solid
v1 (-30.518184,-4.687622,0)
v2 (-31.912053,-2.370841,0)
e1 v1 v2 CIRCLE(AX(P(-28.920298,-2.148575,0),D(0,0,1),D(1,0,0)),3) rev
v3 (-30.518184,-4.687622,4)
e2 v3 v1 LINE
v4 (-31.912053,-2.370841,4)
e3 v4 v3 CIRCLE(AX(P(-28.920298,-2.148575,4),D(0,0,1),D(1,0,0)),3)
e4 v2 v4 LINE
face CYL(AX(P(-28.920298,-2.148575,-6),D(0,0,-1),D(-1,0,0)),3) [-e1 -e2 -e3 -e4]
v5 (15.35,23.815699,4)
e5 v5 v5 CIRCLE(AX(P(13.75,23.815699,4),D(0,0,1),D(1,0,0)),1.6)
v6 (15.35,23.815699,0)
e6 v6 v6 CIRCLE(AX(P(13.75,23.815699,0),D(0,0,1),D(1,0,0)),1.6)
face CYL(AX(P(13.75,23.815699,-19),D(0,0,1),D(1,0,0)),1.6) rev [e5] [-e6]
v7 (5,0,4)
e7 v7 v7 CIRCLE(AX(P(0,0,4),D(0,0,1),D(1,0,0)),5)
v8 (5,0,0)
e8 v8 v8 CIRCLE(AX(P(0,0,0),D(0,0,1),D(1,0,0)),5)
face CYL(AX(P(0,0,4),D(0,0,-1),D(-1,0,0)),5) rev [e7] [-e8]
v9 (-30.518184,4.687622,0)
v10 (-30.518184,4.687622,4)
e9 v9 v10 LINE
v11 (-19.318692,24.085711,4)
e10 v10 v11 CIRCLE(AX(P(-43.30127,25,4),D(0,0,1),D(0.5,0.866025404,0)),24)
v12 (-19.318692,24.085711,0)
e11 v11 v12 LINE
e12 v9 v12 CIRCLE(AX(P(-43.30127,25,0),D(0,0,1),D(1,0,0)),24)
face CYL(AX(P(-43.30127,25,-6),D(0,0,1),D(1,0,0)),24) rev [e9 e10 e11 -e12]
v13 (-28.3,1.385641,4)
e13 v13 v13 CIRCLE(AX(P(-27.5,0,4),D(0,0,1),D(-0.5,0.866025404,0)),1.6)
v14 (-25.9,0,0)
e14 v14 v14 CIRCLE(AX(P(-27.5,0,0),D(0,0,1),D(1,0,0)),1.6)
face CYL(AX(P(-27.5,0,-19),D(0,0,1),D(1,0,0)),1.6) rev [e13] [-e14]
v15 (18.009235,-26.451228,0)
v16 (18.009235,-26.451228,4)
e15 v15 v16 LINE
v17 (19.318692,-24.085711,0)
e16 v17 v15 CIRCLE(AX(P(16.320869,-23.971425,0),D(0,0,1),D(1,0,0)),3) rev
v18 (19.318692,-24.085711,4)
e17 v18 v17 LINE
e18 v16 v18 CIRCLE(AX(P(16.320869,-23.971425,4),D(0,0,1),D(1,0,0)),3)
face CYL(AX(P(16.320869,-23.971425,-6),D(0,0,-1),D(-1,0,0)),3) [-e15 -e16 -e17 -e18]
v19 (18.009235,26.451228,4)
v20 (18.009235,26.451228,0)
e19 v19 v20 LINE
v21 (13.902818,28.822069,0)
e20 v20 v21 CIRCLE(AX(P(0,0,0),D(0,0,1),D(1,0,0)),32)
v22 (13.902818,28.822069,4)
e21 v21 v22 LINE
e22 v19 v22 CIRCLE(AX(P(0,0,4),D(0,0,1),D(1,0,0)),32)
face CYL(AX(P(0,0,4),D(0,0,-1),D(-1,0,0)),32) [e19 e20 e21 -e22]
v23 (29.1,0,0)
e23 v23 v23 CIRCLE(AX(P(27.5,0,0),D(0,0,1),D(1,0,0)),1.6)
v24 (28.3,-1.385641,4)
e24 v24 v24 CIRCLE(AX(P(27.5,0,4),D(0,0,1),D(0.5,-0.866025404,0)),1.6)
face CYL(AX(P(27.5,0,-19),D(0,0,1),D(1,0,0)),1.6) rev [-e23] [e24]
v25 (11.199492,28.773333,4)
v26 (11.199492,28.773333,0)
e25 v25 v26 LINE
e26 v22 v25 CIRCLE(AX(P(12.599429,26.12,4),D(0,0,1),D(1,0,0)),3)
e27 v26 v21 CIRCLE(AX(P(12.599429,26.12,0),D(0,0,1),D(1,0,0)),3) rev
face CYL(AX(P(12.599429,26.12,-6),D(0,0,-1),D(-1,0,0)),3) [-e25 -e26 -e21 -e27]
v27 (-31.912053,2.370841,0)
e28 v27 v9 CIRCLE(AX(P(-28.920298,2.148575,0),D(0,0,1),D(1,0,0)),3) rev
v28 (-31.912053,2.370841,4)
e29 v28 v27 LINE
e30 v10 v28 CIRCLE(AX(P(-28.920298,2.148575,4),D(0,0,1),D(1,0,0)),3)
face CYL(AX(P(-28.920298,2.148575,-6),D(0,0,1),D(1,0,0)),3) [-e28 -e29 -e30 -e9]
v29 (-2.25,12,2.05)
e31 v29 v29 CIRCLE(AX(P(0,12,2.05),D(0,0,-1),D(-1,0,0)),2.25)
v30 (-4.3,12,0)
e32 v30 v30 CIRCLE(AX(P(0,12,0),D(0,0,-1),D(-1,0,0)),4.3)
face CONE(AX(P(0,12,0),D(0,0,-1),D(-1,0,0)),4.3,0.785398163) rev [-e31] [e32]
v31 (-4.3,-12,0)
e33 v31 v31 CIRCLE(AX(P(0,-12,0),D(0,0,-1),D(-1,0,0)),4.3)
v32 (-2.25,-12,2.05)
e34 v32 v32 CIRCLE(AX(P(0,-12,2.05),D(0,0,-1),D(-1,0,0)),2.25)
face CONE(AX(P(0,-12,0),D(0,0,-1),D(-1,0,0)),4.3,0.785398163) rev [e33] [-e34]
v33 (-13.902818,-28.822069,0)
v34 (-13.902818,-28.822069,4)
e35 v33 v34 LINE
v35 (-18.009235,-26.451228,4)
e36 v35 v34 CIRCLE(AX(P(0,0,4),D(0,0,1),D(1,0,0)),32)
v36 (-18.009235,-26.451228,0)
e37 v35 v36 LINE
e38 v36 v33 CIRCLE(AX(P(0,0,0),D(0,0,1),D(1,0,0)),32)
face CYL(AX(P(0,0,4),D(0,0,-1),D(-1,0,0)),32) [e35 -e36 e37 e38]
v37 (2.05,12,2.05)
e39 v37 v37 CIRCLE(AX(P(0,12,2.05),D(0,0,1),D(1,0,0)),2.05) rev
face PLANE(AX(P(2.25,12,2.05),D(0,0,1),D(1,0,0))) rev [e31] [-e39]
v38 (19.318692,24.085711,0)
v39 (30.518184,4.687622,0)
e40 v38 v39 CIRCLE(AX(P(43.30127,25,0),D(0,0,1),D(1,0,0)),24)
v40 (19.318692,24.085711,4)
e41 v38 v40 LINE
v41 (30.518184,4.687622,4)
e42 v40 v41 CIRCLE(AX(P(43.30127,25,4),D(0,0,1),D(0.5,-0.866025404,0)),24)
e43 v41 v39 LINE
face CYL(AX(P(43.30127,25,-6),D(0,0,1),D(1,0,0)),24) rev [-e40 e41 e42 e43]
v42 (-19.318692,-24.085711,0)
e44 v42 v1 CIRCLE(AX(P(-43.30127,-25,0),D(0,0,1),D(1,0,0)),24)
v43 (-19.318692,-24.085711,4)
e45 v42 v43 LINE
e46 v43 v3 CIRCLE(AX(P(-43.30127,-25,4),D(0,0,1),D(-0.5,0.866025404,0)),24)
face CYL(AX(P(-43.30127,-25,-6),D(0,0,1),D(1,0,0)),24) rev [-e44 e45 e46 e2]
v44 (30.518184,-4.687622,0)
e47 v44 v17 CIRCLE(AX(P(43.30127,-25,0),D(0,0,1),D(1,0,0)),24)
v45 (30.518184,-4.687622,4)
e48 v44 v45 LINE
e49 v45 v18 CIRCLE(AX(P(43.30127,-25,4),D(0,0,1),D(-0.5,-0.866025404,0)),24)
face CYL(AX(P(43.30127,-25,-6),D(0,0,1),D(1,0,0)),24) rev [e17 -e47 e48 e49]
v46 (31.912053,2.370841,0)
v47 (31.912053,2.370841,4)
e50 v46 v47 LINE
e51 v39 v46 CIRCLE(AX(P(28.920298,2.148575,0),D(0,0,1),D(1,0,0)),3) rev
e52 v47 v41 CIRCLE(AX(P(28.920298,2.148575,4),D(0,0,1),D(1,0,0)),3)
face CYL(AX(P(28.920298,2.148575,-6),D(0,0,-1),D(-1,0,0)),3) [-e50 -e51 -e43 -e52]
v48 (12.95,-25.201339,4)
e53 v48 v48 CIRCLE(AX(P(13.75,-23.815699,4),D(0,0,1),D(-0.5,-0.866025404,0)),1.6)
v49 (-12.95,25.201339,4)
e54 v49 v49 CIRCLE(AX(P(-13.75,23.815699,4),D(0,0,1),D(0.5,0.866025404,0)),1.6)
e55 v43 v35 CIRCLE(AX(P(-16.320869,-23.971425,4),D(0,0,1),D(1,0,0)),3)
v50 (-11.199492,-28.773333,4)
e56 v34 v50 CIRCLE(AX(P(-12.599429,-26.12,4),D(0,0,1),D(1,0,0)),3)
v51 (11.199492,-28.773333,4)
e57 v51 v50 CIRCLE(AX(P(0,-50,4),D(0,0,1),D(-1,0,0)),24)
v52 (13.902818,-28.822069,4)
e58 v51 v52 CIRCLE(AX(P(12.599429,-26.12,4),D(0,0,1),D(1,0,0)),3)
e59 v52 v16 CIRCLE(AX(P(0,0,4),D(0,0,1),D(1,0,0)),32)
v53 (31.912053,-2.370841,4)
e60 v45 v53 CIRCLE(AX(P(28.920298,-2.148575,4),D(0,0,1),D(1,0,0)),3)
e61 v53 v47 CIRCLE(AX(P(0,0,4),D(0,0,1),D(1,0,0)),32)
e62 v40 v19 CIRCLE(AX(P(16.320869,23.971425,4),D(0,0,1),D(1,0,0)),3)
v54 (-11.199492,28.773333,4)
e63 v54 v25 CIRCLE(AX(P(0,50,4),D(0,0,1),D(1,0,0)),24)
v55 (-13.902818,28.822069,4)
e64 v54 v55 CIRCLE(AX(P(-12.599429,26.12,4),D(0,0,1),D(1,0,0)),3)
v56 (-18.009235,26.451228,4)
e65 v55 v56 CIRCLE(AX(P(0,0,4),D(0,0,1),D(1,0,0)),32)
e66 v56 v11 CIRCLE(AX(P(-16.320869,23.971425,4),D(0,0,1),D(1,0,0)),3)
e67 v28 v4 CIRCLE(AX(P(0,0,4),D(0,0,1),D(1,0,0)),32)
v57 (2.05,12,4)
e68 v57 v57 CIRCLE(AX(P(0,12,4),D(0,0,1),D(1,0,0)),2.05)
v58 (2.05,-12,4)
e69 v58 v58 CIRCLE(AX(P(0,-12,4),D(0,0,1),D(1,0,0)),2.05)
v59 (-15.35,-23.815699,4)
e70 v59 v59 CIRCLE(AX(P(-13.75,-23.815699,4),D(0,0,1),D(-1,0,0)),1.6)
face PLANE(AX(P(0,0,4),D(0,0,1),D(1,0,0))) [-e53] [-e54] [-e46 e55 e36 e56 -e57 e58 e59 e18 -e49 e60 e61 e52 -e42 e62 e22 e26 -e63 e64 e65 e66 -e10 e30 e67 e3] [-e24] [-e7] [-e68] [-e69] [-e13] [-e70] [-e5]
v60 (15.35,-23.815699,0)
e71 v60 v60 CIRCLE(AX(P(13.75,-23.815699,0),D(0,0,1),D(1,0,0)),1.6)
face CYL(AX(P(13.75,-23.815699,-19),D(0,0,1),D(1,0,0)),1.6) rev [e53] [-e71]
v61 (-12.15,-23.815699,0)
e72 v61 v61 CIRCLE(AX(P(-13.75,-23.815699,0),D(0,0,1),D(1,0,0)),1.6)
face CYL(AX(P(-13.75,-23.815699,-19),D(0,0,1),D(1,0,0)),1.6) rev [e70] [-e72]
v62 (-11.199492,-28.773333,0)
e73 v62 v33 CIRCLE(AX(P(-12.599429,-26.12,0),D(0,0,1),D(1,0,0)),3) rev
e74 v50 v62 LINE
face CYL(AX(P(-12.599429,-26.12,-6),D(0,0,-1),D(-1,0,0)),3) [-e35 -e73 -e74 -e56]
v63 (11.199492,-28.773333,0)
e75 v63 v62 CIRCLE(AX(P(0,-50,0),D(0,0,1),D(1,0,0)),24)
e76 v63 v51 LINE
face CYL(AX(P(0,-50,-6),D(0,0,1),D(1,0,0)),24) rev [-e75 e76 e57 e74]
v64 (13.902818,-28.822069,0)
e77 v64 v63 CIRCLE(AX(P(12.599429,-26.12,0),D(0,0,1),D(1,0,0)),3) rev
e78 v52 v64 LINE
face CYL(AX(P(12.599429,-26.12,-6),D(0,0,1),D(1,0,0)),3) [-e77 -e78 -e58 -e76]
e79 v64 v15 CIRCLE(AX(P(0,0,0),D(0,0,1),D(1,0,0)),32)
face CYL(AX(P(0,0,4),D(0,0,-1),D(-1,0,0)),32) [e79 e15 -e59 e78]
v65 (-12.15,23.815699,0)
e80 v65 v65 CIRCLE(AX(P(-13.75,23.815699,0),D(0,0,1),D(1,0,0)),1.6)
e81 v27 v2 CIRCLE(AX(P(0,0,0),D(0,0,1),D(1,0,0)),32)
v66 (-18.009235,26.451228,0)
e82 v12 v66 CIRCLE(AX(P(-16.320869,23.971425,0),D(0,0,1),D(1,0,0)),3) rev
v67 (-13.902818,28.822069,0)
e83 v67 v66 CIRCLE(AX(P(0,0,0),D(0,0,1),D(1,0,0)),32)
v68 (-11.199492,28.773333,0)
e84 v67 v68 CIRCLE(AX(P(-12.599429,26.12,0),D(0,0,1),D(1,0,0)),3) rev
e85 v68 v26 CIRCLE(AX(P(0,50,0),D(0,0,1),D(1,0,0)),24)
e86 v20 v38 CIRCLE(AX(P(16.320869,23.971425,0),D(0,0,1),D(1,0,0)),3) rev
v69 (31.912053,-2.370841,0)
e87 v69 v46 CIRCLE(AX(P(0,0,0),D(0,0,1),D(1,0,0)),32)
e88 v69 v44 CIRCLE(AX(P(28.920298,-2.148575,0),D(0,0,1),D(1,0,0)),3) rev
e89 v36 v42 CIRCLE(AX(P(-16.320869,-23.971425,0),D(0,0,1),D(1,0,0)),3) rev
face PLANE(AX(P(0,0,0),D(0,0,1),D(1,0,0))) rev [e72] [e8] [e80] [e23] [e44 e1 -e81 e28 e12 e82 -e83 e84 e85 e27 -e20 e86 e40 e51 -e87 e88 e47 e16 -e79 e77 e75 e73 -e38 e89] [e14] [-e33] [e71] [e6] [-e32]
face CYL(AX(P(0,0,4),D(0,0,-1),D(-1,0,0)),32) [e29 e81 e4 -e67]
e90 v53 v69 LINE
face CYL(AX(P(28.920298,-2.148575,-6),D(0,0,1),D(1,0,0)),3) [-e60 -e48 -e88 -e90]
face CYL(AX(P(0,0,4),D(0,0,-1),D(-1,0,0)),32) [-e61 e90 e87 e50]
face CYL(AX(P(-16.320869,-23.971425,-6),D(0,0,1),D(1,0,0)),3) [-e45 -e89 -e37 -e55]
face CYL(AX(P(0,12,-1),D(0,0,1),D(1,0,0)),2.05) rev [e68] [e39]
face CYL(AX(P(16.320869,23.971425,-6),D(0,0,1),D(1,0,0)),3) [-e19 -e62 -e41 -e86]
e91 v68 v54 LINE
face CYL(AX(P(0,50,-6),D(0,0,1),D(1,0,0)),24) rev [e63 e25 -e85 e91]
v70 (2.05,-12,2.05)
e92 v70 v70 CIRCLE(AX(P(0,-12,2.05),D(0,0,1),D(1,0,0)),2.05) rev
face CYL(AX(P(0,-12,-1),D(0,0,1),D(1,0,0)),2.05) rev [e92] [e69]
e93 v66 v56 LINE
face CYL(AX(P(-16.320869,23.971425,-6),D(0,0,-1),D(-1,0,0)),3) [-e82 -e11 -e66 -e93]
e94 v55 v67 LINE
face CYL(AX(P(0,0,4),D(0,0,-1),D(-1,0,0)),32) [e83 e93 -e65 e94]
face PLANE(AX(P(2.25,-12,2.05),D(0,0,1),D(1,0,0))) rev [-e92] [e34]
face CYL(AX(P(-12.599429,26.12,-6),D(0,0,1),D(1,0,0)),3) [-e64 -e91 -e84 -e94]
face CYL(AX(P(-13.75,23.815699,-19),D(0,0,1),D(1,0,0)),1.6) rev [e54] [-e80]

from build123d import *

# Parameters (mm, degrees)
SKETCH_1_R               = 32
SKETCH_1_R_2             = 5
EXTRUDE_1_DEPTH          = 4
SKETCH_2_R               = 2.05
CUT_EXTRUDE_1_DEPTH      = 5
SKETCH_3_R               = 24
CUT_EXTRUDE_2_DEPTH      = 10
PATTERN_CIRCULAR_1_COUNT = 6
SKETCH_4_R               = 1.6
CUT_EXTRUDE_3_DEPTH      = 23
PATTERN_CIRCULAR_2_COUNT = 6
FILLET_1_R               = 3


# Read off the part's stored shape, not the designer's step: 高级异型孔2
with BuildPart() as part:
    # 草图1 → 凸台-拉伸1 (new body)
    with BuildSketch(Plane.XY):
        Circle(SKETCH_1_R)
        Circle(SKETCH_1_R_2, mode=Mode.SUBTRACT)
    extrude(amount=EXTRUDE_1_DEPTH)

    # 草图2 → 切除-拉伸1 (cut)
    with BuildSketch(Plane.XY.offset(4)):
        with Locations((0, 12)):
            Circle(SKETCH_2_R)
        with Locations((0, -12)):
            Circle(SKETCH_2_R)
    extrude(amount=-CUT_EXTRUDE_1_DEPTH, mode=Mode.SUBTRACT)

    # 草图3 → 切除-拉伸2 (cut)
    with BuildSketch(Plane.XY.offset(4)):
        with Locations((0, 50)):
            Circle(SKETCH_3_R)
    cut_extrude_2 = extrude(amount=-CUT_EXTRUDE_2_DEPTH, mode=Mode.SUBTRACT)

    # 阵列(圆周)1: 切除-拉伸2 ×6 about axis
    pattern_circular_1_axis = Axis((0, 0, 0), (0, 0, 1))
    for i in range(1, PATTERN_CIRCULAR_1_COUNT):
        add(cut_extrude_2.rotate(pattern_circular_1_axis, i * 360 / PATTERN_CIRCULAR_1_COUNT), mode=Mode.SUBTRACT)

    # 草图4 → 切除-拉伸3 (cut)
    with BuildSketch(Plane.XY.offset(4)):
        with Locations((13.75, 23.815698604)):
            Circle(SKETCH_4_R)
    cut_extrude_3 = extrude(amount=-CUT_EXTRUDE_3_DEPTH, mode=Mode.SUBTRACT)

    # 阵列(圆周)2: 切除-拉伸3 ×6 about axis
    pattern_circular_2_axis = Axis((0, 0, 0), (0, 0, 1))
    for i in range(1, PATTERN_CIRCULAR_2_COUNT):
        add(cut_extrude_3.rotate(pattern_circular_2_axis, i * 360 / PATTERN_CIRCULAR_2_COUNT), mode=Mode.SUBTRACT)

    # 圆角1
    fillet_1_edges = [part.edges().sort_by_distance(p)[0] for p in [
        (-12.447071945, 29.48, 2),
        (12.447071945, 29.48, 2),
        (-31.753964876, 3.960519493, 2),
        (-19.306892931, 25.519480507, 2),
        (19.306892931, 25.519480507, 2),
        (31.753964876, 3.960519493, 2),
        (31.753964876, -3.960519493, 2),
        (19.306892931, -25.519480507, 2),
        (-19.306892931, -25.519480507, 2),
        (-31.753964876, -3.960519493, 2),
        (12.447071945, -29.48, 2),
        (-12.447071945, -29.48, 2),
    ]]
    fillet(fillet_1_edges, radius=FILLET_1_R)

    # 高级异型孔2 outline → 高级异型孔2 (revolve, cut)
    with BuildSketch(Plane.XZ.offset(12)):
        Polygon((2.25, 2.05), (2.05, 2.05), (2.05, 0), (4.3, 0), align=None)
    revolve(axis=Axis((0, -12, 0), (0, 0, 1)), mode=Mode.SUBTRACT)

    # Other 2 2 outline → Other 2 2 (revolve, cut)
    with BuildSketch(Plane.XZ.offset(-12)):
        Polygon((2.25, 2.05), (2.05, 2.05), (2.05, 0), (4.3, 0), align=None)
    revolve(axis=Axis((0, 12, 0), (0, 0, 1)), mode=Mode.SUBTRACT)


solid = part.part
